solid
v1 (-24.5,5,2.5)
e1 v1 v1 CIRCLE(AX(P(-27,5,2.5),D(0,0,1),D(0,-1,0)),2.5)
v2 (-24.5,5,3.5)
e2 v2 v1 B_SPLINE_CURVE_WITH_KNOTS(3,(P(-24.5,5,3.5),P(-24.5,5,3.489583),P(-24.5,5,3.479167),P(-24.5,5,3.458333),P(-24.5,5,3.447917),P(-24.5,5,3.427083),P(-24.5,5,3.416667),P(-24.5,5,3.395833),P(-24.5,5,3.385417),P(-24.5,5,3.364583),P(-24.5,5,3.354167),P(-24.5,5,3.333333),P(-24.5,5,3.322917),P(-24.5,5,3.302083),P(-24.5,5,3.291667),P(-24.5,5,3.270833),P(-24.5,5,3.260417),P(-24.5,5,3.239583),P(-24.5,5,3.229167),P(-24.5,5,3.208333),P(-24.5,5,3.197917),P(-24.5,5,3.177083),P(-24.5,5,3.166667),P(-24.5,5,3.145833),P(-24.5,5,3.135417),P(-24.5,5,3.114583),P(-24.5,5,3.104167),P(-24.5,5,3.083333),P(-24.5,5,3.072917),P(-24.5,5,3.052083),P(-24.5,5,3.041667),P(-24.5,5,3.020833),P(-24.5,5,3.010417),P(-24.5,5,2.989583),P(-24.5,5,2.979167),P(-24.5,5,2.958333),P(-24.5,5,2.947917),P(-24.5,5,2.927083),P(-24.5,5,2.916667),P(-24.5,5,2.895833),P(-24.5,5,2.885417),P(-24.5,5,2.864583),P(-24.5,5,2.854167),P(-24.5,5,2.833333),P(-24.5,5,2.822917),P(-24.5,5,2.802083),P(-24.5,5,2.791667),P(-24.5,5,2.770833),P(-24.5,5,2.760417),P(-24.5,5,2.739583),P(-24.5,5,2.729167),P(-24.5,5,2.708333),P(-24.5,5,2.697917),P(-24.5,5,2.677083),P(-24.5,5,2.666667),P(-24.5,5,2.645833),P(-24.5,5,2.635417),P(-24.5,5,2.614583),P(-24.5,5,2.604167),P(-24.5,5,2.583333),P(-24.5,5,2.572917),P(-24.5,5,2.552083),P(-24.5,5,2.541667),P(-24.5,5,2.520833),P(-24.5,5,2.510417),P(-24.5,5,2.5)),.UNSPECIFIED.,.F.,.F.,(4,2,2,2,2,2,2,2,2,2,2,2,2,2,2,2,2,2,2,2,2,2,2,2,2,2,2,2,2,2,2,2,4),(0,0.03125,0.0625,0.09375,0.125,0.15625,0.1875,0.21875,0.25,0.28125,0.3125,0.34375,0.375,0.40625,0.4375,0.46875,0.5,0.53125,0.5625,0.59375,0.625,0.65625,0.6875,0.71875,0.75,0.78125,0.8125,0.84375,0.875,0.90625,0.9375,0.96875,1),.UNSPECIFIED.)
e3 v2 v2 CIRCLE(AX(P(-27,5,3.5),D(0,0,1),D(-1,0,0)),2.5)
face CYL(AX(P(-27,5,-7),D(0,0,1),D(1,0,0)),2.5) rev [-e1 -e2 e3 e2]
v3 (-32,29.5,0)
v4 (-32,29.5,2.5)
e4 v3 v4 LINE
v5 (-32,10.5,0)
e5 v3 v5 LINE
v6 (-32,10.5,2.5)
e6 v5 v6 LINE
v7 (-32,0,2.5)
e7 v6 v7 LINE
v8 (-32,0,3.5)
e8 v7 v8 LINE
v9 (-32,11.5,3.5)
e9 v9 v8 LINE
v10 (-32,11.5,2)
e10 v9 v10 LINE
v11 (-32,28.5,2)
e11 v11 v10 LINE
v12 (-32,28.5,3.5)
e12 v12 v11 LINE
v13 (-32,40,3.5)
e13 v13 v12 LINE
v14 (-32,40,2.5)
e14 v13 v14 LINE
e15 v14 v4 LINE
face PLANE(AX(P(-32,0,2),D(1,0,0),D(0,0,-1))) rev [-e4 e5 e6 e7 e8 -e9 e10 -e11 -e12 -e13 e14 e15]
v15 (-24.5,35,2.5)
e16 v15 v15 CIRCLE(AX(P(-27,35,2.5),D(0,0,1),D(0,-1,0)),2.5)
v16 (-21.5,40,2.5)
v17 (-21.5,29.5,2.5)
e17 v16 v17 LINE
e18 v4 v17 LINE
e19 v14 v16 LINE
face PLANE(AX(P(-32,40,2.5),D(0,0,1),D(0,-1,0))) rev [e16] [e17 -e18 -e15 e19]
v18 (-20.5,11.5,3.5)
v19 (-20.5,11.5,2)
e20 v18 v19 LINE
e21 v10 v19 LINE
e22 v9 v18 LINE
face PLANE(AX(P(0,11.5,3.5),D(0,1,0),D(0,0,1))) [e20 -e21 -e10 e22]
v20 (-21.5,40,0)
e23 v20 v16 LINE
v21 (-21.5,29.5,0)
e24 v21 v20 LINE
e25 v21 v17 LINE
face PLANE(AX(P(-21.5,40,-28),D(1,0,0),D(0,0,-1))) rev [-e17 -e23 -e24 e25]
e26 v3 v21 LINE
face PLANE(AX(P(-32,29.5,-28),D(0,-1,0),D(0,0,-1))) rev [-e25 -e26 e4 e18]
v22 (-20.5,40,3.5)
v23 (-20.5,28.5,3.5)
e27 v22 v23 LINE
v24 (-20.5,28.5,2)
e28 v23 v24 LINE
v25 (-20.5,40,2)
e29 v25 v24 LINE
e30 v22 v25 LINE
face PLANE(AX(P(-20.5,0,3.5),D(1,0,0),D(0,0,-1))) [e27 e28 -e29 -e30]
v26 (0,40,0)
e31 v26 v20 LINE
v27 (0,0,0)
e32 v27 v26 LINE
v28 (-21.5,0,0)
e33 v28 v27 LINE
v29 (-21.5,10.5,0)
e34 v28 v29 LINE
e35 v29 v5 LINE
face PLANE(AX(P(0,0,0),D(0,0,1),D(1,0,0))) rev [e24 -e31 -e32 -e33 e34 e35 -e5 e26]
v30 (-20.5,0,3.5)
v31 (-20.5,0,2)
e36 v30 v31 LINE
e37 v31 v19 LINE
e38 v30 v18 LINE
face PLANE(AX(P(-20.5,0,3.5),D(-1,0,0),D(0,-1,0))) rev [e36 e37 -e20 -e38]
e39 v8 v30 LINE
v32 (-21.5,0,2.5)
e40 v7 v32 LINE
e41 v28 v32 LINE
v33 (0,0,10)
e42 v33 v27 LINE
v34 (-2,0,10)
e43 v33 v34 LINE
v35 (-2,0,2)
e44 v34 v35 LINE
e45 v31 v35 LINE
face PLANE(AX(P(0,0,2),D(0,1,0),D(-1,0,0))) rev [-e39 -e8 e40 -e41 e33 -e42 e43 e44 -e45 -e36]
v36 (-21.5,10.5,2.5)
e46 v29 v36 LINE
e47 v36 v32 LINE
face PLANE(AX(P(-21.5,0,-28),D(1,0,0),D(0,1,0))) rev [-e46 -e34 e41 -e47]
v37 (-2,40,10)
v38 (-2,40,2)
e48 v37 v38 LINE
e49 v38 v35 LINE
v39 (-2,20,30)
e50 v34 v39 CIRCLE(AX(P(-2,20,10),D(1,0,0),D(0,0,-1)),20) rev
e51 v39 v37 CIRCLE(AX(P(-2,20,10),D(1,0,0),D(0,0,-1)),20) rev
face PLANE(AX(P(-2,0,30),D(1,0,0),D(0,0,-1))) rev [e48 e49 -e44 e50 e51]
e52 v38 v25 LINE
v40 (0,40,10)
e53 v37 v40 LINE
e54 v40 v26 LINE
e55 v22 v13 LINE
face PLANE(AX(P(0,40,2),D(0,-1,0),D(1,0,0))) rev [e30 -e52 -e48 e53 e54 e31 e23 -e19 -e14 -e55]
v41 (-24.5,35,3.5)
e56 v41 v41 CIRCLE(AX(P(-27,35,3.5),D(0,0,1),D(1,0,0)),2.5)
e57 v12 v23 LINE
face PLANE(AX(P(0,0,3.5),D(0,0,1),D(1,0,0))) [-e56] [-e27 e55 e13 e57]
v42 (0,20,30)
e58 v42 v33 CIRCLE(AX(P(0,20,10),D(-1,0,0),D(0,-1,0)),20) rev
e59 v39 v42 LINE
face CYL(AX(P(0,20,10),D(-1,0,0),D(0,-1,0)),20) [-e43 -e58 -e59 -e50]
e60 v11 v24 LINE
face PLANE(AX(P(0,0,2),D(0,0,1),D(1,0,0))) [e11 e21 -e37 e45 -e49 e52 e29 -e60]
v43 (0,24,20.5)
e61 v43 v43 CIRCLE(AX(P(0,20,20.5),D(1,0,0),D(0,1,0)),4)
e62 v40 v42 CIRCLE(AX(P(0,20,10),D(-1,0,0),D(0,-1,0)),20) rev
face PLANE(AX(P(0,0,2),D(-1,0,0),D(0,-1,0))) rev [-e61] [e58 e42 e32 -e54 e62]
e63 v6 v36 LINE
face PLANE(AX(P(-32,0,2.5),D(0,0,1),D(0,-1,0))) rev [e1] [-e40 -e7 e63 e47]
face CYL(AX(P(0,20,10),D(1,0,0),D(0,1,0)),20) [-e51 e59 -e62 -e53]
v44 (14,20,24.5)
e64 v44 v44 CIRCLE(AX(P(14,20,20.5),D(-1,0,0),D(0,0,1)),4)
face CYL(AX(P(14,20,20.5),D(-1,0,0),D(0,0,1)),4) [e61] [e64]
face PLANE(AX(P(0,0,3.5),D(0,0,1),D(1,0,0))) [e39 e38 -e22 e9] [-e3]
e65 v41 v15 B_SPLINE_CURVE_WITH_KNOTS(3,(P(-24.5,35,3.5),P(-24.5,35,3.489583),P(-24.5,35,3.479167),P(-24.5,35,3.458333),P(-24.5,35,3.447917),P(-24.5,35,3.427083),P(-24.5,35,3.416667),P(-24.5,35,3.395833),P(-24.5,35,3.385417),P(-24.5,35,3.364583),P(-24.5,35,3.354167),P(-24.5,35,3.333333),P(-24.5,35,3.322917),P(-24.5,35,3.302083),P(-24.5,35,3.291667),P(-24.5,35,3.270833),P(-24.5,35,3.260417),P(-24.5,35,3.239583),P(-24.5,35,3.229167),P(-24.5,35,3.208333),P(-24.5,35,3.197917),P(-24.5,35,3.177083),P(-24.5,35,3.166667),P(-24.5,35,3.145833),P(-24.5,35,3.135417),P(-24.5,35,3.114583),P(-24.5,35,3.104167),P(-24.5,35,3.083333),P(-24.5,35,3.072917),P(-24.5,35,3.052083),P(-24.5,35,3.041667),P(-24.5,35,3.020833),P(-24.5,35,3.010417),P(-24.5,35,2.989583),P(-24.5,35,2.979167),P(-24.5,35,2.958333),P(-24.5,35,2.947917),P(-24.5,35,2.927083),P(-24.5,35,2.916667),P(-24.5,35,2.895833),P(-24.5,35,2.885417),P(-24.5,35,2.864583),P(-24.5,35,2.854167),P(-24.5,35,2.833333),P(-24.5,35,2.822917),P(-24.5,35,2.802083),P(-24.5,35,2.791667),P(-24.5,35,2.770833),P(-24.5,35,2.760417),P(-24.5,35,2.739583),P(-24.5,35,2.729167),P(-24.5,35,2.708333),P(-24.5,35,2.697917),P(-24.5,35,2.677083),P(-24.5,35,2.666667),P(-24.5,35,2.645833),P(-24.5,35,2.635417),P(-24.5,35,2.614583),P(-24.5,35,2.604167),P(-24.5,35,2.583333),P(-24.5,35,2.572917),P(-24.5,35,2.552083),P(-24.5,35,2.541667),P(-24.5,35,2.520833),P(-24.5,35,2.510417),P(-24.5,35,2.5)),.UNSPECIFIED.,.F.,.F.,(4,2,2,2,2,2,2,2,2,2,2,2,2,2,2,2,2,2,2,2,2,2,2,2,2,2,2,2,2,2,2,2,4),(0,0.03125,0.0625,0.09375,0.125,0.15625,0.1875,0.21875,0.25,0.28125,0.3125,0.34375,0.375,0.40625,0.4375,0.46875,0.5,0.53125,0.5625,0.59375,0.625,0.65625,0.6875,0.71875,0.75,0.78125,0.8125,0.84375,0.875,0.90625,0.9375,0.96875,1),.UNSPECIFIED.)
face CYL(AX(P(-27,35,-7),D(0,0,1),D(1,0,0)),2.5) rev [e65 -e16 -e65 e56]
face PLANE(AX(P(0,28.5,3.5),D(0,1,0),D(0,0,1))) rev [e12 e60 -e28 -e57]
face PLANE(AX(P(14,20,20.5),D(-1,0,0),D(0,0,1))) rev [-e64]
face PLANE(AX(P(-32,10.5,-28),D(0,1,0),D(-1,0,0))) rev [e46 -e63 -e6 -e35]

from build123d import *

# Parameters (mm, degrees)
ESQUISSE1_W             = 32
ESQUISSE1_H             = 40
BOSS_EXTRU_1_DEPTH      = 2
ESQUISSE2_W             = 2
ESQUISSE2_H             = 40
BOSS_EXTRU_2_DEPTH      = 28
CONG_1_R                = 20
ESQUISSE3_R             = 4
ENL_V_MAT_EXTRU_1_DEPTH = 30
ESQUISSE4_W             = 10.5
ESQUISSE4_H             = 10.5
ENL_V_MAT_EXTRU_2_DEPTH = 30
ESQUISSE5_W             = 1
ESQUISSE5_H             = 1
ESQUISSE5_W_2           = 10.5
ESQUISSE5_H_2           = 10.5
BOSS_EXTRU_5_DEPTH      = 1.5
ESQUISSE6_W             = 1
ESQUISSE6_H             = 10.5
BOSS_EXTRU_6_DEPTH      = 10.5
ESQUISSE7_R             = 2.5
ENL_V_MAT_EXTRU_3_DEPTH = 10.5
BOSS_EXTRU_7_START      = -16
ESQUISSE8_R             = 4
BOSS_EXTRU_7_DEPTH      = 16


with BuildPart() as part:
    # Esquisse1 → Boss.-Extru.1 (new body)
    with BuildSketch(Plane.XY):
        with Locations((-16, 20)):
            Rectangle(ESQUISSE1_W, ESQUISSE1_H)
    extrude(amount=BOSS_EXTRU_1_DEPTH)

    # Esquisse2 → Boss.-Extru.2 (add)
    with BuildSketch(Plane.XY.offset(2)):
        with Locations((-1, 20)):
            Rectangle(ESQUISSE2_W, ESQUISSE2_H)
    extrude(amount=BOSS_EXTRU_2_DEPTH)

    # Congé1
    cong_1_edges = [part.edges().sort_by_distance(p)[0] for p in [
        (-1, 40, 30),
        (-1, 0, 30),
    ]]
    fillet(cong_1_edges, radius=CONG_1_R - 0.0001)  # a hair under: the kernel refuses the full size

    # Esquisse3 → Enlèv. mat.-Extru.1 (cut)
    with BuildSketch(Plane(origin=(0, 0, 0), x_dir=(0, 0, -1), z_dir=(1, 0, 0))):
        with Locations(Location((-20.5, 20, 0), (0, 0, 90))):
            Circle(ESQUISSE3_R)
    extrude(amount=-ENL_V_MAT_EXTRU_1_DEPTH, mode=Mode.SUBTRACT)

    # Esquisse4 → Enlèv. mat.-Extru.2 (cut)
    with BuildSketch(Plane.XY.offset(2)):
        with Locations((-26.75, 34.75)):
            Rectangle(ESQUISSE4_W, ESQUISSE4_H)
        with Locations((-26.75, 5.25)):
            Rectangle(ESQUISSE4_W, ESQUISSE4_H)
    extrude(amount=-ENL_V_MAT_EXTRU_2_DEPTH, mode=Mode.SUBTRACT)

    # Esquisse5 → Boss.-Extru.5 (add)
    with BuildSketch(Plane.XY.offset(2)):
        with Locations((-21, 29)):
            Rectangle(ESQUISSE5_W, ESQUISSE5_H)
        with Locations((-26.75, 29)):
            Rectangle(ESQUISSE5_W_2, ESQUISSE5_H)
        with Locations((-21, 34.75)):
            Rectangle(ESQUISSE5_W, ESQUISSE5_H_2)
        with Locations((-21, 11)):
            Rectangle(ESQUISSE5_W, ESQUISSE5_H)
        with Locations((-21, 5.25)):
            Rectangle(ESQUISSE5_W, ESQUISSE5_H_2)
        with Locations((-26.75, 11)):
            Rectangle(ESQUISSE5_W_2, ESQUISSE5_H)
    extrude(amount=BOSS_EXTRU_5_DEPTH)

    # Esquisse6 → Boss.-Extru.6 (add)
    with BuildSketch(Plane.ZY.offset(21.5)):
        with Locations((3, 34.75)):
            Rectangle(ESQUISSE6_W, ESQUISSE6_H)
        with Locations((3, 5.25)):
            Rectangle(ESQUISSE6_W, ESQUISSE6_H)
    extrude(amount=BOSS_EXTRU_6_DEPTH)

    # Esquisse7 → Enlèv. mat.-Extru.3 (cut)
    with BuildSketch(Plane.XY.offset(3.5)):
        with Locations((-27, 35)):
            Circle(ESQUISSE7_R)
        with Locations((-27, 5)):
            Circle(ESQUISSE7_R)
    extrude(amount=-ENL_V_MAT_EXTRU_3_DEPTH, mode=Mode.SUBTRACT)

    # Esquisse8 → Boss.-Extru.7 (add)
    with BuildSketch(Plane.ZY.offset(2).offset(BOSS_EXTRU_7_START)):
        with Locations((20.5, 20)):
            Circle(ESQUISSE8_R)
    extrude(amount=BOSS_EXTRU_7_DEPTH)


solid = part.part
